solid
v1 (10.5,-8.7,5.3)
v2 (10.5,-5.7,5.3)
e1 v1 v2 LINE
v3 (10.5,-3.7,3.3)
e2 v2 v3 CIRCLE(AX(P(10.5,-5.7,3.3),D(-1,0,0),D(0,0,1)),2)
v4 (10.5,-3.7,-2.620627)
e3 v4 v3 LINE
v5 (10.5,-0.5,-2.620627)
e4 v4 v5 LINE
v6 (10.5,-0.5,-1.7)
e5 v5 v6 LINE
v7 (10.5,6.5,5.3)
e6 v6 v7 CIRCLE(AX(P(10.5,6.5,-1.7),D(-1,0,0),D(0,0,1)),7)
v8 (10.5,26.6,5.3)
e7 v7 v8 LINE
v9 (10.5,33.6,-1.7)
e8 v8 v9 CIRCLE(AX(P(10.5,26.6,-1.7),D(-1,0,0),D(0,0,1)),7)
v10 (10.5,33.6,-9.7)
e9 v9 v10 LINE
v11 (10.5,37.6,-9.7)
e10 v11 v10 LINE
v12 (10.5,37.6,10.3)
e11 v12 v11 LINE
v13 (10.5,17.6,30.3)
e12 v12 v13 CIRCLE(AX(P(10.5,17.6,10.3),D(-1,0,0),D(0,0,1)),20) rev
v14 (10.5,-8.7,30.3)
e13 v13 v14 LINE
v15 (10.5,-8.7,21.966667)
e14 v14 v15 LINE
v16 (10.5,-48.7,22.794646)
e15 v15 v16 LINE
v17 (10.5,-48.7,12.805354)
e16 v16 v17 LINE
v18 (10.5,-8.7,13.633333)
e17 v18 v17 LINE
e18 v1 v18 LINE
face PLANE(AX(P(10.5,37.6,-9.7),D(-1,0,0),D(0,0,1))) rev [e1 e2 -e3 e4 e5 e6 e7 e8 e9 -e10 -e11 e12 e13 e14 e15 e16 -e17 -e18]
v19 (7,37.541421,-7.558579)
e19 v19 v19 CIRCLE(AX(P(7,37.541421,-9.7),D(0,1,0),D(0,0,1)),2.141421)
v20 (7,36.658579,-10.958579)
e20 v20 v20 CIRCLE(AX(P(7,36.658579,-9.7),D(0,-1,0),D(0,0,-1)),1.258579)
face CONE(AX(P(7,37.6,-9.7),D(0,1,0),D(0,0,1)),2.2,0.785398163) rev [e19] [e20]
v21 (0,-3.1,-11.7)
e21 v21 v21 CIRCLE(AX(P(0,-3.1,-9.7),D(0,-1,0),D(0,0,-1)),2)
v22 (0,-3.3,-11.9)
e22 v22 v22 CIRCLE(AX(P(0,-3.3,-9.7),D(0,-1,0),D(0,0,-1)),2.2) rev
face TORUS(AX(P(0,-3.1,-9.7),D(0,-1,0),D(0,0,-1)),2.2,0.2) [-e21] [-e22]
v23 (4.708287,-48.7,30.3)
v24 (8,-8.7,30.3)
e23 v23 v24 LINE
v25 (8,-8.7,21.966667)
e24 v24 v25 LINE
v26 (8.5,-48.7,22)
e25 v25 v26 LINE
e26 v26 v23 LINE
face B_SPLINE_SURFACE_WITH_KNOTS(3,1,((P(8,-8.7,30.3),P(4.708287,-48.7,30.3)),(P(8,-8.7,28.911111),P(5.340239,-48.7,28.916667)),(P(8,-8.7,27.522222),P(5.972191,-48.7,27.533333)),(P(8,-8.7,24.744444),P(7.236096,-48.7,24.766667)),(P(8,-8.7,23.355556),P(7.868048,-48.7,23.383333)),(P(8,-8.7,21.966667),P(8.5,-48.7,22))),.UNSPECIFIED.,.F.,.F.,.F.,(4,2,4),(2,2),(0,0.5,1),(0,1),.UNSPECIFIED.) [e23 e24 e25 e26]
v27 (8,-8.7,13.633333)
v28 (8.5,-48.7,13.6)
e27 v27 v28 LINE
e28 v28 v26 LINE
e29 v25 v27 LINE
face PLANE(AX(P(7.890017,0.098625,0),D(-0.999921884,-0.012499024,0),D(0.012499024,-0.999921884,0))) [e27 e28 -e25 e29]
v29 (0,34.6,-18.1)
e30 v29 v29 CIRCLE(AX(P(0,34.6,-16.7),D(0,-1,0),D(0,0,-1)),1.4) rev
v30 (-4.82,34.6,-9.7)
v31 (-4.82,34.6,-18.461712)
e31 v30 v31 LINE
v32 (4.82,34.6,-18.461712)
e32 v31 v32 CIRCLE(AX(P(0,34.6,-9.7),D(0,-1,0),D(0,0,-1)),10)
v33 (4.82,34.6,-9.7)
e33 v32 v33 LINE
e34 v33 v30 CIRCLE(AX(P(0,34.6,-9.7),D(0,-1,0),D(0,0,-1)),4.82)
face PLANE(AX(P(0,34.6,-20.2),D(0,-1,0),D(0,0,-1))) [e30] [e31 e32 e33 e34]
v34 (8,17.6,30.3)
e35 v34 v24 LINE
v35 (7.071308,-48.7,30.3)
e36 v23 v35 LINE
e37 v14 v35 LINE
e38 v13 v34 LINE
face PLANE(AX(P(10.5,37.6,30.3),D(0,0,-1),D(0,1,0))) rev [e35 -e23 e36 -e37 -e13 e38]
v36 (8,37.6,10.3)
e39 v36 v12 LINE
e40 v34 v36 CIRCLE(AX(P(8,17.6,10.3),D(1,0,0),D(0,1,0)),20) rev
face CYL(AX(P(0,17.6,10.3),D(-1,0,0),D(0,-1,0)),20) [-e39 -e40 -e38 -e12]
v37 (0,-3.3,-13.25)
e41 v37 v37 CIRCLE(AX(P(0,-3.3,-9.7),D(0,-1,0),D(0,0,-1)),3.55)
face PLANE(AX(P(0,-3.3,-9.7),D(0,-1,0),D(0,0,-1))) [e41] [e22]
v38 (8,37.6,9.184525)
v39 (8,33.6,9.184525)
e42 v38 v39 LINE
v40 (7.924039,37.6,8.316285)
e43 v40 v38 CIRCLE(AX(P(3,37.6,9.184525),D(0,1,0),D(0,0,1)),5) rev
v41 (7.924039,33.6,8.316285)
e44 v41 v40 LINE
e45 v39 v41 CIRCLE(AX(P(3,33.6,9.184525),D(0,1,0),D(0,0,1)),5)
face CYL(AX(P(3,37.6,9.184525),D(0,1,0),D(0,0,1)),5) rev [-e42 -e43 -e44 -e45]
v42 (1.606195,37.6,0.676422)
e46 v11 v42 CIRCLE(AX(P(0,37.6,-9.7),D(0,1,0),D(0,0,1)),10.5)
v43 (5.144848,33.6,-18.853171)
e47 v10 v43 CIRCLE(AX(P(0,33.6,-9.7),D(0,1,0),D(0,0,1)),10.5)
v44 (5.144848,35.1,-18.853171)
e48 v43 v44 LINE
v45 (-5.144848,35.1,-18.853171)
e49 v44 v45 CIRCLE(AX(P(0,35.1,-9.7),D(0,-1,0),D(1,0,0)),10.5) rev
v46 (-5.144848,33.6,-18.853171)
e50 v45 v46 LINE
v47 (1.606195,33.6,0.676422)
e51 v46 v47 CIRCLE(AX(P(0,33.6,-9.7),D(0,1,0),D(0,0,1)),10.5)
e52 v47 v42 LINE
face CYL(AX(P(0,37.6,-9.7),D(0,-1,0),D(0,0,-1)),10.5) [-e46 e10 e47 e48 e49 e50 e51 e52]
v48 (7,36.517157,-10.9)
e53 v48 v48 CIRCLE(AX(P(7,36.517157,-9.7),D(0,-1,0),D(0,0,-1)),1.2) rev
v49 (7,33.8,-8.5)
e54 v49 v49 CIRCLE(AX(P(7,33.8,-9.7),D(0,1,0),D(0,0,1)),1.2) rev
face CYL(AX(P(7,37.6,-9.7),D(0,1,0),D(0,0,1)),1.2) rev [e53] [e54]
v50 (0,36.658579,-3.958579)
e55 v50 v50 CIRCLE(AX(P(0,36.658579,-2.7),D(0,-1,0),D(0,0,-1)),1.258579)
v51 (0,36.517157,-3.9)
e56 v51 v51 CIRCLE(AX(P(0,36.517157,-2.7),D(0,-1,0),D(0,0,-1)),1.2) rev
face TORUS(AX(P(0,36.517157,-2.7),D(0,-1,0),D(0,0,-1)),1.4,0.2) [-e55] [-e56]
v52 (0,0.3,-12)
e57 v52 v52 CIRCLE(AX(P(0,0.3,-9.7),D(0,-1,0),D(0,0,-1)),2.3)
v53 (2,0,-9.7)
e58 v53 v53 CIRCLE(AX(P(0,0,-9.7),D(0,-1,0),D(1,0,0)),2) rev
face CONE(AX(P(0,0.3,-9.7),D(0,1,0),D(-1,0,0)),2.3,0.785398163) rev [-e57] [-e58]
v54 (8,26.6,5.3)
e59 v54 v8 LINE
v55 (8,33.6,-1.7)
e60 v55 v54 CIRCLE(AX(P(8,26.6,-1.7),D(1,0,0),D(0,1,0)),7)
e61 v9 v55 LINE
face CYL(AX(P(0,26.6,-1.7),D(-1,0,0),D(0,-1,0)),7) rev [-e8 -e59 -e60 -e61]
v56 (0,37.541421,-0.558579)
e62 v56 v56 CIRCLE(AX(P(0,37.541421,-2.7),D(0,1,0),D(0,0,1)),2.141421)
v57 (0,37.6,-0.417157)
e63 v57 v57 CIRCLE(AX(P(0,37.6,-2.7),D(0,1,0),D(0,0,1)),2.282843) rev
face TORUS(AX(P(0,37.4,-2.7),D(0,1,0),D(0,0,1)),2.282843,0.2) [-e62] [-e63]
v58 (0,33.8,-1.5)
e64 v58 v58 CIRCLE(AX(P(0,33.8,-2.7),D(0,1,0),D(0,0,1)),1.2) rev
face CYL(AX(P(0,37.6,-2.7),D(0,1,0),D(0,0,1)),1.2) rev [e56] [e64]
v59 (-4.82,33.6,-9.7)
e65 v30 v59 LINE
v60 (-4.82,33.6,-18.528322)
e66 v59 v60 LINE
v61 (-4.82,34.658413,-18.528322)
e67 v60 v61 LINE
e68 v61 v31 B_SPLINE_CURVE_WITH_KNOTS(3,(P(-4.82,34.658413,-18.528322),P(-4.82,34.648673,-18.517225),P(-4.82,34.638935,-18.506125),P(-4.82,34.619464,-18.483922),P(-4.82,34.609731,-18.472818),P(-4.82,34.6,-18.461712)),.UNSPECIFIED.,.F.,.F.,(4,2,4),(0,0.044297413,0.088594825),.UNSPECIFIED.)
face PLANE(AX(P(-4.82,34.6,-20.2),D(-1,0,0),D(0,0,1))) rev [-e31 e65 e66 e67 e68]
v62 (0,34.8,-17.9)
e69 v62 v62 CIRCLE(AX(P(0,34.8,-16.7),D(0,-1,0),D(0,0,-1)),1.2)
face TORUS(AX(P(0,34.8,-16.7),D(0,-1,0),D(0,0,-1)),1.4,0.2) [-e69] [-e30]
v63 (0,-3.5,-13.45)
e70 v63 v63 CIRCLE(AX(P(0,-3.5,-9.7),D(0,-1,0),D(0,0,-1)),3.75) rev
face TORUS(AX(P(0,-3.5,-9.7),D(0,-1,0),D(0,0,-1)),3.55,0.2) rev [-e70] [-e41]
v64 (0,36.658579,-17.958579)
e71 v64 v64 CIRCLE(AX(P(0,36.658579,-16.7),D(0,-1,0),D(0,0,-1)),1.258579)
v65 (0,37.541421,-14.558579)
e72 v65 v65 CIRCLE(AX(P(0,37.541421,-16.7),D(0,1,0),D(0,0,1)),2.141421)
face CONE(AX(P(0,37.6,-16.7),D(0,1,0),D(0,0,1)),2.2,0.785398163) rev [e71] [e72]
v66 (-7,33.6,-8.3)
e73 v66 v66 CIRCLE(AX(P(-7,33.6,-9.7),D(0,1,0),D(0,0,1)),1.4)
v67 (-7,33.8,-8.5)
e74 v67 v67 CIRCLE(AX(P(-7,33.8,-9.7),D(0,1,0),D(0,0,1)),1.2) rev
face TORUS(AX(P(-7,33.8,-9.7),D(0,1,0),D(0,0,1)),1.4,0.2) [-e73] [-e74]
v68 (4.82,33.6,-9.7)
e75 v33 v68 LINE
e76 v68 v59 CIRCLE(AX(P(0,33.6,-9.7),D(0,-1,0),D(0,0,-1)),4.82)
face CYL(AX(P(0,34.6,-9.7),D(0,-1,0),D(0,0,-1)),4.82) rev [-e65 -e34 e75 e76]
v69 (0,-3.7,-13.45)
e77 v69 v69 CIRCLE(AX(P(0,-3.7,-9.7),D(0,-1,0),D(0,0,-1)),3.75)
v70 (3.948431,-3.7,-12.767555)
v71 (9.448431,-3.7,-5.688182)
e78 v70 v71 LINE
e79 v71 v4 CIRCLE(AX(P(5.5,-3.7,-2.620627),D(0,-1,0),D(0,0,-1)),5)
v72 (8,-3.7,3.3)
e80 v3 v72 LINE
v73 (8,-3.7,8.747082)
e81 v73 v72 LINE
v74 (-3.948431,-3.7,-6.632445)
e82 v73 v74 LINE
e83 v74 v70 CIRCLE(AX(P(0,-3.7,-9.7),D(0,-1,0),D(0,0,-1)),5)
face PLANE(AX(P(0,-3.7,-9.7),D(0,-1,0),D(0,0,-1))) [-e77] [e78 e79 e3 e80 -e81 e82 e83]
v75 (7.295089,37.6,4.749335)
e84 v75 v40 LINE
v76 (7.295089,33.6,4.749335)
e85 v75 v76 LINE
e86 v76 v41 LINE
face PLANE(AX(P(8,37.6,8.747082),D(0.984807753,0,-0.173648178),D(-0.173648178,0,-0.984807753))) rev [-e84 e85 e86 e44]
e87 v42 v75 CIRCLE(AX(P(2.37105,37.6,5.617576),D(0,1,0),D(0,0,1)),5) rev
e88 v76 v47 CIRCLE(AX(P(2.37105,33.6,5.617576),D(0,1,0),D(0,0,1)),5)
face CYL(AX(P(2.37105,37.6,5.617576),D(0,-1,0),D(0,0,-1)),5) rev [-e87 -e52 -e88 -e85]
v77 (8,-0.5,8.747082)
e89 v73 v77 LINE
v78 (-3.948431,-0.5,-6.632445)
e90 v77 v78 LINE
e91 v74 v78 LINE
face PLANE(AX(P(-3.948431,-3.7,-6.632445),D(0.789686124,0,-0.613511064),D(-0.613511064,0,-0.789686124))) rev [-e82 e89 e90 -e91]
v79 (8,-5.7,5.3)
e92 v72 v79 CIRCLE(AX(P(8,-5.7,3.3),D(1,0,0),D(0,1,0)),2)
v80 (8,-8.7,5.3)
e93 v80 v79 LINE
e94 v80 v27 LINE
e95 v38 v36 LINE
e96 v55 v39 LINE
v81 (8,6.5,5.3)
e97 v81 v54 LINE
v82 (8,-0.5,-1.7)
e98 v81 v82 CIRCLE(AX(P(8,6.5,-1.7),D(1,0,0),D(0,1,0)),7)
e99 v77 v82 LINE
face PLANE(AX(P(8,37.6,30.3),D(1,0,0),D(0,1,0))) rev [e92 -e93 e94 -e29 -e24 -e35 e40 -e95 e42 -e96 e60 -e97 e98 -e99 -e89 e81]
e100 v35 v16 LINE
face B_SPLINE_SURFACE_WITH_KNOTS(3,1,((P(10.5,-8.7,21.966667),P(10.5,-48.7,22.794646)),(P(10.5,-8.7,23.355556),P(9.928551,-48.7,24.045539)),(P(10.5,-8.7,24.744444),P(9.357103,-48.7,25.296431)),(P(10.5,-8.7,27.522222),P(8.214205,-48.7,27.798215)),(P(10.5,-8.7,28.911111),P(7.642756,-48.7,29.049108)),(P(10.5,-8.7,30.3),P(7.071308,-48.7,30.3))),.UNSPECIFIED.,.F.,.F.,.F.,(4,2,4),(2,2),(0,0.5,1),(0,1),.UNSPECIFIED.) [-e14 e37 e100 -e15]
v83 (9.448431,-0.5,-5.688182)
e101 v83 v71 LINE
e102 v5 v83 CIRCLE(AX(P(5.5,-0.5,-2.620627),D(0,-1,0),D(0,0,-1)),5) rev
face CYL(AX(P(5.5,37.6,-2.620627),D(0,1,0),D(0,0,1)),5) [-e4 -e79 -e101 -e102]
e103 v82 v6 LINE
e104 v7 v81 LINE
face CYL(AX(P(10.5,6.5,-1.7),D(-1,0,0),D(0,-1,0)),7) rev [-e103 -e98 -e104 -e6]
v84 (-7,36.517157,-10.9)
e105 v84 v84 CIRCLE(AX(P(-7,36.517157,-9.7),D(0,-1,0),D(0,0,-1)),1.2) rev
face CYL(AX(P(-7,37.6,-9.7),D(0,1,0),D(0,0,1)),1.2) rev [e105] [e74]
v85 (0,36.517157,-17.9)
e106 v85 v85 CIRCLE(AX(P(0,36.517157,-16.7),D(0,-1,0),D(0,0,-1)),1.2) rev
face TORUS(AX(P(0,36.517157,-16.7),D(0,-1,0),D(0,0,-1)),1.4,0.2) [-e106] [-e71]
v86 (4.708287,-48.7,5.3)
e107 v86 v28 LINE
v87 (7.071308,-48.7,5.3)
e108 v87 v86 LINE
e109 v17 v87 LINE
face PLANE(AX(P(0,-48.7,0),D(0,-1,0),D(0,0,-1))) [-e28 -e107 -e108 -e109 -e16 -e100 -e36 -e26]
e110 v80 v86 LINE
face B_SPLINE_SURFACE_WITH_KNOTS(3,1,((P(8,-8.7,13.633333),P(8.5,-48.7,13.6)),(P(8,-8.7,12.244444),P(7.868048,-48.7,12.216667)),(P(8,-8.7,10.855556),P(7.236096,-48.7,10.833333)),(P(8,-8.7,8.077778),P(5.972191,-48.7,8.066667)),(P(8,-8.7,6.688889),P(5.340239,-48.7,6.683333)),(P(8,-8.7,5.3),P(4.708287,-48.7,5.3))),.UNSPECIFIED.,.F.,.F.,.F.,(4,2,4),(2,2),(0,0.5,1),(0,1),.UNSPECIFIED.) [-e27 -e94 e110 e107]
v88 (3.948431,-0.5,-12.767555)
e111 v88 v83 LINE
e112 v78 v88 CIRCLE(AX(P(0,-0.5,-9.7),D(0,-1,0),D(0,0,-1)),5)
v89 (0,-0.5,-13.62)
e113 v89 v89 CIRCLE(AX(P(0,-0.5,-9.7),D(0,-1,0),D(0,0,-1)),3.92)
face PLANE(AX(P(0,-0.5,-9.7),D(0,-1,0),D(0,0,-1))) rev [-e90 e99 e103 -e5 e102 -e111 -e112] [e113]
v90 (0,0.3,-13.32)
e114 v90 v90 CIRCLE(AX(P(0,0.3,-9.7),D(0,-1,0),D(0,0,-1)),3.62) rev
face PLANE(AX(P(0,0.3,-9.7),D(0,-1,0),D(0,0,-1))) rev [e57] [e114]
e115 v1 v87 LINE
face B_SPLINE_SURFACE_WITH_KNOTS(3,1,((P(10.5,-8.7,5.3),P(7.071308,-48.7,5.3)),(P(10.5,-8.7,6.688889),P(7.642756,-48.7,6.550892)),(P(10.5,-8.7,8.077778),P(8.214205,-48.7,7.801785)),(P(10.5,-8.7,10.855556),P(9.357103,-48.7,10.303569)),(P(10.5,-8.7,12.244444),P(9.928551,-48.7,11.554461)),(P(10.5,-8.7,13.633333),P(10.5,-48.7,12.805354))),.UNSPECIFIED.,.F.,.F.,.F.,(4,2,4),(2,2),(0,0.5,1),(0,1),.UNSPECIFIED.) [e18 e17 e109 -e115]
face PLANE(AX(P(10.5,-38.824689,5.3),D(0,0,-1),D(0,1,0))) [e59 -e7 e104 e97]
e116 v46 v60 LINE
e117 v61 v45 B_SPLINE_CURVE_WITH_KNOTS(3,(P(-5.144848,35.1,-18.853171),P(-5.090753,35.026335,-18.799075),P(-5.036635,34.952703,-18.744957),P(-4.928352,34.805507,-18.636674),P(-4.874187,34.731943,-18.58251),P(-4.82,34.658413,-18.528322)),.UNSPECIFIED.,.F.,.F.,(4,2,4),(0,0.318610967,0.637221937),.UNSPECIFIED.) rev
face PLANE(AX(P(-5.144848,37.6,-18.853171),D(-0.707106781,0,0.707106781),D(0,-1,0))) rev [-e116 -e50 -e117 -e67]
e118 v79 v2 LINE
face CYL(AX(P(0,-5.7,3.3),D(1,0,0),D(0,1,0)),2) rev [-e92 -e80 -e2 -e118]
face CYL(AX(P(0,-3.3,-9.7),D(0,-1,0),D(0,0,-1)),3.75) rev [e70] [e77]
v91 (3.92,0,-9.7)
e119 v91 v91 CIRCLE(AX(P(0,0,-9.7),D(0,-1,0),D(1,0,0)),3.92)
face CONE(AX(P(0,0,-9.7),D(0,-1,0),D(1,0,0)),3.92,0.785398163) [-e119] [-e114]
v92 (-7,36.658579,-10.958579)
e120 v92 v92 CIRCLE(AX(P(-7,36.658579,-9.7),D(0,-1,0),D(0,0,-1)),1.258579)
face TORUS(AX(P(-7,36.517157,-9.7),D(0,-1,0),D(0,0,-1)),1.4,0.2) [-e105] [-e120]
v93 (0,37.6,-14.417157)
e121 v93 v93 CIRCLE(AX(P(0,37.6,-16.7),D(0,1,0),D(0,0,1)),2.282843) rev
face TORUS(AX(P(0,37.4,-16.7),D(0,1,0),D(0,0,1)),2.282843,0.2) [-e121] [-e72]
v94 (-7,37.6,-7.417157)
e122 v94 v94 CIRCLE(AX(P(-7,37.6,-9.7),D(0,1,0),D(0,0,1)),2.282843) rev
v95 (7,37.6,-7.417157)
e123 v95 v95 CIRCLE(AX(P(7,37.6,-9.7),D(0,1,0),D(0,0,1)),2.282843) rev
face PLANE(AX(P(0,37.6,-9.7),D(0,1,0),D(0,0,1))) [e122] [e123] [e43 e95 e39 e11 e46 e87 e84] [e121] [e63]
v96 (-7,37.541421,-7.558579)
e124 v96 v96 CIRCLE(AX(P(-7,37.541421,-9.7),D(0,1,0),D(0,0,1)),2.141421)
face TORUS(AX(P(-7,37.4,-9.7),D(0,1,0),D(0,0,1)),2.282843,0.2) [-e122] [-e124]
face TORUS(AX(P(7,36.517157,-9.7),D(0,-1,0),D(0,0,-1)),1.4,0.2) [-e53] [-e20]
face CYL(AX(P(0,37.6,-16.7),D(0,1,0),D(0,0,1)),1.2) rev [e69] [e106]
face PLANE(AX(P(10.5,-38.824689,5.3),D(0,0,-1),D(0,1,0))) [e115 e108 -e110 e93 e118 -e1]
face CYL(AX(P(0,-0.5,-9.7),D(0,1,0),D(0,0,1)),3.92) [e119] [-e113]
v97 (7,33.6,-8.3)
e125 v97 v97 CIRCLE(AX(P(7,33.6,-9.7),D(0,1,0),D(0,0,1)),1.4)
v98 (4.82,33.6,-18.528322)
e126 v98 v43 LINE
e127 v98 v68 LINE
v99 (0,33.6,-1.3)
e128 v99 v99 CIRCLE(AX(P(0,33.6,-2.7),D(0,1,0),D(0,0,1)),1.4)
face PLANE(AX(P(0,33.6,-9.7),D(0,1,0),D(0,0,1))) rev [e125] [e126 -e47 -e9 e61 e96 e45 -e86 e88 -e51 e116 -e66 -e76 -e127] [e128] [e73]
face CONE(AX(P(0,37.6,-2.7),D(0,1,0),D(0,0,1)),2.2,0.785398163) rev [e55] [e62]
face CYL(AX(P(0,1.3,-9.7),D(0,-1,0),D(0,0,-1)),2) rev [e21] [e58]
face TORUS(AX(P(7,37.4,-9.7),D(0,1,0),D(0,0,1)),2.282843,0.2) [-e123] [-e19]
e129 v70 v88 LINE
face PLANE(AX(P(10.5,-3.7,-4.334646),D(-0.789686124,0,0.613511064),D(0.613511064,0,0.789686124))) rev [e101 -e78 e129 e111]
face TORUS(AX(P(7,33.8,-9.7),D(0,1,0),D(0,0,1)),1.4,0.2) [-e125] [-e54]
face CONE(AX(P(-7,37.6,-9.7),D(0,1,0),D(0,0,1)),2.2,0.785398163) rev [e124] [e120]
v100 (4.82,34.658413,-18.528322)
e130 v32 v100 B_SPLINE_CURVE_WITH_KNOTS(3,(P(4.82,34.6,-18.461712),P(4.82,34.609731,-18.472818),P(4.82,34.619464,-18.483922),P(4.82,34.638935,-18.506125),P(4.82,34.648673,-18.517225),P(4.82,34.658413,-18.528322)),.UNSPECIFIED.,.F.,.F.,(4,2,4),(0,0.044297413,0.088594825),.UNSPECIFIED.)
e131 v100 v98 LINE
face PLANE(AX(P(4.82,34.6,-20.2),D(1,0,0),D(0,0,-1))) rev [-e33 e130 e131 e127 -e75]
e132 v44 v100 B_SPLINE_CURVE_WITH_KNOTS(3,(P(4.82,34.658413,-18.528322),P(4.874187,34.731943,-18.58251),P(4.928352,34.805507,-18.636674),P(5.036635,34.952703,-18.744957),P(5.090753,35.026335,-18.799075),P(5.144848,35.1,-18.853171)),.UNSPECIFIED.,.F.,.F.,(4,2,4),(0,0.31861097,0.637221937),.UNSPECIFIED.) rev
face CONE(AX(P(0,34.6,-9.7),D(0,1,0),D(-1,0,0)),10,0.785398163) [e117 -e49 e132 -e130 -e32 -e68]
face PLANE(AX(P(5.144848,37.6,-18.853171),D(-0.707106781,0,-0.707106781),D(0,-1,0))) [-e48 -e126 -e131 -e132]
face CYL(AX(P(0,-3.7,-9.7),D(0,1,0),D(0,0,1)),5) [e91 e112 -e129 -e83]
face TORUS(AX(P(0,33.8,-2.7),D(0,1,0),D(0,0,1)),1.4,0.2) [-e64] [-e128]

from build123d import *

# Parameters (mm, degrees)
BOSS_EXTRUDE1_DEPTH                                 = 4
CSK_FOR_M2_COUNTERSUNK_FLAT_HEAD_SCREW1_D           = 2.4
CSK_FOR_M2_COUNTERSUNK_FLAT_HEAD_SCREW1_DEPTH       = 4
CSK_FOR_M2_COUNTERSUNK_FLAT_HEAD_SCREW1_CSINK_D     = 4.4
CSK_FOR_M2_COUNTERSUNK_FLAT_HEAD_SCREW1_CSINK_ANGLE = 90
CSK_FOR_M2_COUNTERSUNK_FLAT_HEAD_SCREW1_TIP         = 0.721032743
CUT_EXTRUDE1_DEPTH                                  = 1
BOSS_EXTRUDE2_START                                 = 0.2
SKETCH6_R                                           = 3.92
BOSS_EXTRUDE2_DEPTH                                 = 0.8
BOSS_EXTRUDE3_DEPTH                                 = 3.2
SKETCH10_R                                          = 2
CUT_EXTRUDE2_DEPTH                                  = 5
SKETCH11_R                                          = 3.75
CUT_EXTRUDE3_DEPTH                                  = 0.4
SKETCH12_W                                          = 2.5
SKETCH12_H                                          = 25
BOSS_EXTRUDE4_DEPTH                                 = 46.3
FILLET1_R                                           = 7
FILLET2_R                                           = 20
CHAMFER1_SIZE                                       = 0.3
FILLET3_R                                           = 0.2
CHAMFER2_SIZE                                       = 0.5
FILLET4_R                                           = 0.2
FILLET6_R                                           = 5
FILLET7_R                                           = 2


with BuildPart() as part:
    # Sketch2 → Boss-Extrude1 (new body)
    with BuildSketch(Plane(origin=(0, 33.6, 0), x_dir=(1, 0, 0), z_dir=(0, 1, 0))):
        with BuildLine():
            Line((10.5, 9.7), (10.5, -8.747082129))
            Line((10.5, -8.747082129), (10.5, -30.3))
            Line((10.5, -30.3), (8, -30.3))
            Line((8, -30.3), (8, -8.747082129))
            Line((8, -8.747082129), (6.236730193, 1.252917871))
            ThreePointArc((6.236730193, 1.252917871), (-9.373784375, 14.430979443), (10.5, 9.7))
        make_face()
    extrude(amount=BOSS_EXTRUDE1_DEPTH)

    # CSK for M2 Countersunk Flat Head Screw1
    with Locations(Plane(origin=(0, 37.6, 0), x_dir=(1, 0, 0), z_dir=(0, 1, 0))):
        with Locations((0, 2.7), (7, 9.7), (0, 16.7), (-7, 9.7)):
            CounterSinkHole(CSK_FOR_M2_COUNTERSUNK_FLAT_HEAD_SCREW1_D / 2, CSK_FOR_M2_COUNTERSUNK_FLAT_HEAD_SCREW1_CSINK_D / 2, depth=CSK_FOR_M2_COUNTERSUNK_FLAT_HEAD_SCREW1_DEPTH, counter_sink_angle=CSK_FOR_M2_COUNTERSUNK_FLAT_HEAD_SCREW1_CSINK_ANGLE)
            with Locations((0, 0, -(CSK_FOR_M2_COUNTERSUNK_FLAT_HEAD_SCREW1_DEPTH + CSK_FOR_M2_COUNTERSUNK_FLAT_HEAD_SCREW1_TIP / 2))):  # 118° drill point
                Cone(0, CSK_FOR_M2_COUNTERSUNK_FLAT_HEAD_SCREW1_D / 2, CSK_FOR_M2_COUNTERSUNK_FLAT_HEAD_SCREW1_TIP, mode=Mode.SUBTRACT)

    # Sketch5 → Cut-Extrude1 (cut)
    with BuildSketch(Plane.XZ.offset(-33.6)):
        with BuildLine():
            Line((-4.82, -20.2), (-4.82, -9.7))
            ThreePointArc((-4.82, -9.7), (0, -4.88), (4.82, -9.7))
            Line((4.82, -9.7), (4.82, -20.2))
            ThreePointArc((4.82, -20.2), (0, -25.02), (-4.82, -20.2))
        make_face()
    extrude(amount=-CUT_EXTRUDE1_DEPTH, mode=Mode.SUBTRACT)



with BuildPart() as body_2:
    # Sketch6 → Boss-Extrude2 (new body)
    with BuildSketch(Plane.XZ.offset(-0.5).offset(BOSS_EXTRUDE2_START)):
        with Locations(Location((0, -9.7, 0), (0, 0, 270))):
            Circle(SKETCH6_R)
    extrude(amount=BOSS_EXTRUDE2_DEPTH)

    # Sketch7 → Boss-Extrude3 (add)
    with BuildSketch(Plane.XZ.offset(0.5)):
        with BuildLine():
            Line((-3.948430619, -6.632444679), (8, 8.747082129))
            Line((8, 8.747082129), (8, 30.3))
            Line((8, 30.3), (10.5, 30.3))
            Line((10.5, 30.3), (10.5, -4.334645582))
            Line((10.5, -4.334645582), (3.948430619, -12.767555321))
            ThreePointArc((3.948430619, -12.767555321), (-3.067555321, -13.648430619), (-3.948430619, -6.632444679))
        make_face()
    extrude(amount=BOSS_EXTRUDE3_DEPTH)

    # Sketch10 → Cut-Extrude2 (cut)
    with BuildSketch(Plane.XZ.offset(3.7)):
        with Locations(Location((0, -9.7, 0), (0, 0, 270))):
            Circle(SKETCH10_R)
    extrude(amount=-CUT_EXTRUDE2_DEPTH, mode=Mode.SUBTRACT)

    # Sketch11 → Cut-Extrude3 (cut)
    with BuildSketch(Plane.XZ.offset(3.7)):
        with Locations(Location((0, -9.7, 0), (0, 0, 270))):
            Circle(SKETCH11_R)
    extrude(amount=-CUT_EXTRUDE3_DEPTH, mode=Mode.SUBTRACT)


with BuildPart() as part_1:
    add(part.part)

    add(body_2.part)  # Boss-Extrude4 merges body 2
    # Sketch12 → Boss-Extrude4 (add)
    with BuildSketch(Plane(origin=(0, 37.6, 0), x_dir=(1, 0, 0), z_dir=(0, 1, 0))):
        with Locations((9.25, -17.8)):
            Rectangle(SKETCH12_W, SKETCH12_H)
    extrude(amount=-BOSS_EXTRUDE4_DEPTH)

    # Fillet1
    fillet1_edges = [part_1.edges().sort_by_distance(p)[0] for p in [
        (9.25, 33.6, 5.3),
        (9.25, -0.5, 5.3),
    ]]
    fillet(fillet1_edges, radius=FILLET1_R)

    # Fillet2
    fillet2_edges = [part_1.edges().sort_by_distance(p)[0] for p in [
        (9.25, 37.6, 30.3),
    ]]
    fillet(fillet2_edges, radius=FILLET2_R)

    # Chamfer1
    chamfer1_edges = [part_1.edges().sort_by_distance(p)[0] for p in [
        (0, 0.3, -7.7),
        (0, 0.3, -5.78),
    ]]
    chamfer(chamfer1_edges, length=CHAMFER1_SIZE)

    # Fillet3
    fillet3_edges = [part_1.edges().sort_by_distance(p)[0] for p in [
        (0, -3.3, -5.95),
        (0, -3.3, -7.7),
    ]]
    fillet(fillet3_edges, radius=FILLET3_R)

    # Chamfer2
    # the kernel refuses this chamfer: 0.5, 0.371068727 mm, written as the material it takes off along each edge
    with BuildSketch(Plane(origin=(-4.82, 34.6, -19.028322464), x_dir=(-0.8802070458412009, 0, 0.47458988237372485), z_dir=(0, -1, 0))) as chamfer2_piece_1:
        with BuildLine():
            Line((0.369059, 0), (CHAMFER2_SIZE * 0.474589882374, -CHAMFER2_SIZE * 0.880207045841))
            Line((CHAMFER2_SIZE * 0.474589882374, -CHAMFER2_SIZE * 0.880207045841), (0, 0))
            ThreePointArc((0, 0), (0.187395474, 0.001621217), (0.369059, 0))
        make_face()
    extrude(amount=2.285841494, mode=Mode.SUBTRACT)
    with BuildSketch(Plane(origin=(4.82, 34.6, -19.028322464), x_dir=(0.8802070458411981, 0, 0.47458988237373034), z_dir=(0, -1, 0))) as chamfer2_piece_2:
        with BuildLine():
            Line((0.369059, 0), (CHAMFER2_SIZE * 0.474589882374, CHAMFER2_SIZE * 0.880207045841))
            Line((CHAMFER2_SIZE * 0.474589882374, CHAMFER2_SIZE * 0.880207045841), (0, 0))
            ThreePointArc((0, 0), (0.187395474, -0.001621217), (0.369059, 0))
        make_face()
    extrude(amount=2.285841494, mode=Mode.SUBTRACT)
    with BuildSketch(Plane(origin=(0, 34.6, -9.7), x_dir=(-0.5641489275295863, 0, -0.825673051254077), z_dir=(-0.825673051254077, 0, 0.5641489275295863))) as chamfer2_piece_3_section:
        Polygon((10.5, -CHAMFER2_SIZE), (10.5 - CHAMFER2_SIZE, 0), (10.5, 0), align=None)
    chamfer2_piece_3 = revolve(axis=Axis((0, 34.6, -9.7), (0, -1, 0)), revolution_arc=68.686424342, mode=Mode.PRIVATE)
    chamfer2_piece_3 = split(chamfer2_piece_3, bisect_by=Plane(origin=(-4.82, 34.6, -9.7), z_dir=(1, 0, 0)), keep=Keep.TOP, mode=Mode.PRIVATE)
    chamfer2_piece_3 = split(chamfer2_piece_3, bisect_by=Plane(origin=(4.82, 34.6, -9.7), z_dir=(-1, 0, 0)), keep=Keep.TOP, mode=Mode.PRIVATE)
    add(chamfer2_piece_3, mode=Mode.SUBTRACT)
    with BuildSketch(Plane(origin=(-4.82, 35.885841494, -19.028322464), x_dir=(-0.8802070458412009, 0, 0.47458988237372485), z_dir=(0, -1, 0))) as chamfer2_piece_4a_section:
        with BuildLine():
            Line((0.369059, 0), (CHAMFER2_SIZE * 0.474589882374, -CHAMFER2_SIZE * 0.880207045841))
            Line((CHAMFER2_SIZE * 0.474589882374, -CHAMFER2_SIZE * 0.880207045841), (0, 0))
            ThreePointArc((0, 0), (0.187395474, 0.001621217), (0.369059, 0))
        make_face()
    chamfer2_piece_4a = extrude(amount=3.571682988, mode=Mode.PRIVATE)
    chamfer2_piece_4a = split(chamfer2_piece_4a, bisect_by=Plane(origin=(-4.82, 34.6, -19.028322464), z_dir=(0, 1, 0)), keep=Keep.TOP, mode=Mode.PRIVATE)
    with BuildSketch(Plane(origin=(0, 34.6, -9.7), x_dir=(-0.5641489275295863, 0, -0.825673051254077), z_dir=(-0.825673051254077, 0, 0.5641489275295863))) as chamfer2_piece_4b_section:
        Polygon((10.5, -CHAMFER2_SIZE), (10.5 - CHAMFER2_SIZE, 0), (10.5, 0), align=None)
    chamfer2_piece_4b = revolve(axis=Axis((0, 34.6, -9.7), (0, -1, 0)), revolution_arc=68.686424342, mode=Mode.PRIVATE)
    chamfer2_piece_4b = split(chamfer2_piece_4b, bisect_by=Plane(origin=(-4.82, 34.6, -9.7), z_dir=(-1, 0, 0)), keep=Keep.TOP, mode=Mode.PRIVATE)
    chamfer2_piece_4 = chamfer2_piece_4a & chamfer2_piece_4b
    add(chamfer2_piece_4, mode=Mode.SUBTRACT)
    with BuildSketch(Plane(origin=(0, 34.6, -9.7), x_dir=(-0.5641489275295863, 0, -0.825673051254077), z_dir=(-0.825673051254077, 0, 0.5641489275295863))) as chamfer2_piece_5a_section:
        Polygon((10.5, -CHAMFER2_SIZE), (10.5 - CHAMFER2_SIZE, 0), (10.5, 0), align=None)
    chamfer2_piece_5a = revolve(axis=Axis((0, 34.6, -9.7), (0, -1, 0)), revolution_arc=68.686424342, mode=Mode.PRIVATE)
    chamfer2_piece_5a = split(chamfer2_piece_5a, bisect_by=Plane(origin=(4.82, 34.6, -9.7), z_dir=(1, 0, 0)), keep=Keep.TOP, mode=Mode.PRIVATE)
    with BuildSketch(Plane(origin=(4.82, 35.885841494, -19.028322464), x_dir=(0.8802070458411981, 0, 0.47458988237373034), z_dir=(0, -1, 0))) as chamfer2_piece_5b_section:
        with BuildLine():
            Line((0.369059, 0), (CHAMFER2_SIZE * 0.474589882374, CHAMFER2_SIZE * 0.880207045841))
            Line((CHAMFER2_SIZE * 0.474589882374, CHAMFER2_SIZE * 0.880207045841), (0, 0))
            ThreePointArc((0, 0), (0.187395474, -0.001621217), (0.369059, 0))
        make_face()
    chamfer2_piece_5b = extrude(amount=3.571682988, mode=Mode.PRIVATE)
    chamfer2_piece_5b = split(chamfer2_piece_5b, bisect_by=Plane(origin=(4.82, 34.6, -19.028322464), z_dir=(0, 1, 0)), keep=Keep.TOP, mode=Mode.PRIVATE)
    chamfer2_piece_5 = chamfer2_piece_5a & chamfer2_piece_5b
    add(chamfer2_piece_5, mode=Mode.SUBTRACT)

    # Fillet4
    fillet4_edges = [part_1.edges().sort_by_distance(p)[0] for p in [
        (-4.8, 37.6, -9.7),
        (-5.8, 33.6, -9.7),
        (-5.8, 36.6, -9.7),
        (2.2, 37.6, -16.7),
        (1.2, 36.6, -16.7),
        (9.2, 37.6, -9.7),
        (8.2, 33.6, -9.7),
        (8.2, 36.6, -9.7),
        (2.2, 37.6, -2.7),
        (1.2, 33.6, -2.7),
        (1.2, 36.6, -2.7),
        (1.2, 34.6, -16.7),
    ]]
    fillet(fillet4_edges, radius=FILLET4_R)

    # Fillet6
    fillet6_edges = [part_1.edges().sort_by_distance(p)[0] for p in [
        (10.5, -2.1, -4.334645582),
        (8, 35.6, 8.747082129),
        (6.236730193, 35.6, -1.252917871),
    ]]
    fillet(fillet6_edges, radius=FILLET6_R)

    # Fillet7
    fillet7_edges = [part_1.edges().sort_by_distance(p)[0] for p in [
        (9.25, -3.7, 5.3),
    ]]
    fillet(fillet7_edges, radius=FILLET7_R)

    # Loft1: read off the stored shape, not the designer's step
    # Loft1: loft between two sections, ruled curve by curve
    loft1_from = [
        Edge.make_bspline([(8, -8.7, 30.3), (8, -8.7, 28.911111111), (8, -8.7, 27.522222222), (8, -8.7, 24.744444444), (8, -8.7, 23.355555556), (8, -8.7, 21.966666667)], [0, 0, 0, 0, 0.5, 0.5, 1, 1, 1, 1], 3),
        Edge.make_bspline([(8, -8.7, 13.633333333), (8, -8.7, 12.244444444), (8, -8.7, 10.855555556), (8, -8.7, 8.077777778), (8, -8.7, 6.688888889), (8, -8.7, 5.3)], [0, 0, 0, 0, 0.5, 0.5, 1, 1, 1, 1], 3),
        Edge.make_bspline([(10.5, -8.7, 5.3), (10.5, -8.7, 6.688888889), (10.5, -8.7, 8.077777778), (10.5, -8.7, 10.855555556), (10.5, -8.7, 12.244444444), (10.5, -8.7, 13.633333333)], [0, 0, 0, 0, 0.5, 0.5, 1, 1, 1, 1], 3),
        Edge.make_bspline([(10.5, -8.7, 21.966666667), (10.5, -8.7, 23.355555556), (10.5, -8.7, 24.744444444), (10.5, -8.7, 27.522222222), (10.5, -8.7, 28.911111111), (10.5, -8.7, 30.3)], [0, 0, 0, 0, 0.5, 0.5, 1, 1, 1, 1], 3),
        Edge.make_line((8, -8.7, 13.633333333), (8, -8.7, 21.966666667)),
        Edge.make_line((10.5, -8.7, 5.3), (8, -8.7, 5.3)),
        Edge.make_line((10.5, -8.7, 30.3), (8, -8.7, 30.3)),
        Edge.make_line((10.5, -8.7, 21.966666667), (10.5, -8.7, 13.633333333)),
    ]
    loft1_to = [
        Edge.make_bspline([(4.708286934, -48.7, 30.3), (5.340239112, -48.7, 28.916666667), (5.972191289, -48.7, 27.533333333), (7.236095645, -48.7, 24.766666667), (7.868047822, -48.7, 23.383333333), (8.5, -48.7, 22)], [0, 0, 0, 0, 0.5, 0.5, 1, 1, 1, 1], 3),
        Edge.make_bspline([(8.5, -48.7, 13.6), (7.868047822, -48.7, 12.216666667), (7.236095645, -48.7, 10.833333333), (5.972191289, -48.7, 8.066666667), (5.340239112, -48.7, 6.683333333), (4.708286934, -48.7, 5.3)], [0, 0, 0, 0, 0.5, 0.5, 1, 1, 1, 1], 3),
        Edge.make_bspline([(7.071307506, -48.7, 5.3), (7.642756255, -48.7, 6.550892284), (8.214205004, -48.7, 7.801784568), (9.357102502, -48.7, 10.303569136), (9.928551251, -48.7, 11.554461419), (10.5, -48.7, 12.805353703)], [0, 0, 0, 0, 0.5, 0.5, 1, 1, 1, 1], 3),
        Edge.make_bspline([(10.5, -48.7, 22.794646297), (9.928551251, -48.7, 24.045538581), (9.357102502, -48.7, 25.296430864), (8.214205004, -48.7, 27.798215432), (7.642756255, -48.7, 29.049107716), (7.071307506, -48.7, 30.3)], [0, 0, 0, 0, 0.5, 0.5, 1, 1, 1, 1], 3),
        Edge.make_line((8.5, -48.7, 13.6), (8.5, -48.7, 22)),
        Edge.make_line((7.071307506, -48.7, 5.3), (4.708286934, -48.7, 5.3)),
        Edge.make_line((7.071307506, -48.7, 30.3), (4.708286934, -48.7, 30.3)),
        Edge.make_line((10.5, -48.7, 22.794646297), (10.5, -48.7, 12.805353703)),
    ]
    loft1 = Solid(Shell([*[Face.make_surface_from_curves(loft1_from[k], loft1_to[k]) for k in range(8)], Face(Wire(loft1_from)), Face(Wire(loft1_to))]))
    add(loft1)


solid = part_1.part
